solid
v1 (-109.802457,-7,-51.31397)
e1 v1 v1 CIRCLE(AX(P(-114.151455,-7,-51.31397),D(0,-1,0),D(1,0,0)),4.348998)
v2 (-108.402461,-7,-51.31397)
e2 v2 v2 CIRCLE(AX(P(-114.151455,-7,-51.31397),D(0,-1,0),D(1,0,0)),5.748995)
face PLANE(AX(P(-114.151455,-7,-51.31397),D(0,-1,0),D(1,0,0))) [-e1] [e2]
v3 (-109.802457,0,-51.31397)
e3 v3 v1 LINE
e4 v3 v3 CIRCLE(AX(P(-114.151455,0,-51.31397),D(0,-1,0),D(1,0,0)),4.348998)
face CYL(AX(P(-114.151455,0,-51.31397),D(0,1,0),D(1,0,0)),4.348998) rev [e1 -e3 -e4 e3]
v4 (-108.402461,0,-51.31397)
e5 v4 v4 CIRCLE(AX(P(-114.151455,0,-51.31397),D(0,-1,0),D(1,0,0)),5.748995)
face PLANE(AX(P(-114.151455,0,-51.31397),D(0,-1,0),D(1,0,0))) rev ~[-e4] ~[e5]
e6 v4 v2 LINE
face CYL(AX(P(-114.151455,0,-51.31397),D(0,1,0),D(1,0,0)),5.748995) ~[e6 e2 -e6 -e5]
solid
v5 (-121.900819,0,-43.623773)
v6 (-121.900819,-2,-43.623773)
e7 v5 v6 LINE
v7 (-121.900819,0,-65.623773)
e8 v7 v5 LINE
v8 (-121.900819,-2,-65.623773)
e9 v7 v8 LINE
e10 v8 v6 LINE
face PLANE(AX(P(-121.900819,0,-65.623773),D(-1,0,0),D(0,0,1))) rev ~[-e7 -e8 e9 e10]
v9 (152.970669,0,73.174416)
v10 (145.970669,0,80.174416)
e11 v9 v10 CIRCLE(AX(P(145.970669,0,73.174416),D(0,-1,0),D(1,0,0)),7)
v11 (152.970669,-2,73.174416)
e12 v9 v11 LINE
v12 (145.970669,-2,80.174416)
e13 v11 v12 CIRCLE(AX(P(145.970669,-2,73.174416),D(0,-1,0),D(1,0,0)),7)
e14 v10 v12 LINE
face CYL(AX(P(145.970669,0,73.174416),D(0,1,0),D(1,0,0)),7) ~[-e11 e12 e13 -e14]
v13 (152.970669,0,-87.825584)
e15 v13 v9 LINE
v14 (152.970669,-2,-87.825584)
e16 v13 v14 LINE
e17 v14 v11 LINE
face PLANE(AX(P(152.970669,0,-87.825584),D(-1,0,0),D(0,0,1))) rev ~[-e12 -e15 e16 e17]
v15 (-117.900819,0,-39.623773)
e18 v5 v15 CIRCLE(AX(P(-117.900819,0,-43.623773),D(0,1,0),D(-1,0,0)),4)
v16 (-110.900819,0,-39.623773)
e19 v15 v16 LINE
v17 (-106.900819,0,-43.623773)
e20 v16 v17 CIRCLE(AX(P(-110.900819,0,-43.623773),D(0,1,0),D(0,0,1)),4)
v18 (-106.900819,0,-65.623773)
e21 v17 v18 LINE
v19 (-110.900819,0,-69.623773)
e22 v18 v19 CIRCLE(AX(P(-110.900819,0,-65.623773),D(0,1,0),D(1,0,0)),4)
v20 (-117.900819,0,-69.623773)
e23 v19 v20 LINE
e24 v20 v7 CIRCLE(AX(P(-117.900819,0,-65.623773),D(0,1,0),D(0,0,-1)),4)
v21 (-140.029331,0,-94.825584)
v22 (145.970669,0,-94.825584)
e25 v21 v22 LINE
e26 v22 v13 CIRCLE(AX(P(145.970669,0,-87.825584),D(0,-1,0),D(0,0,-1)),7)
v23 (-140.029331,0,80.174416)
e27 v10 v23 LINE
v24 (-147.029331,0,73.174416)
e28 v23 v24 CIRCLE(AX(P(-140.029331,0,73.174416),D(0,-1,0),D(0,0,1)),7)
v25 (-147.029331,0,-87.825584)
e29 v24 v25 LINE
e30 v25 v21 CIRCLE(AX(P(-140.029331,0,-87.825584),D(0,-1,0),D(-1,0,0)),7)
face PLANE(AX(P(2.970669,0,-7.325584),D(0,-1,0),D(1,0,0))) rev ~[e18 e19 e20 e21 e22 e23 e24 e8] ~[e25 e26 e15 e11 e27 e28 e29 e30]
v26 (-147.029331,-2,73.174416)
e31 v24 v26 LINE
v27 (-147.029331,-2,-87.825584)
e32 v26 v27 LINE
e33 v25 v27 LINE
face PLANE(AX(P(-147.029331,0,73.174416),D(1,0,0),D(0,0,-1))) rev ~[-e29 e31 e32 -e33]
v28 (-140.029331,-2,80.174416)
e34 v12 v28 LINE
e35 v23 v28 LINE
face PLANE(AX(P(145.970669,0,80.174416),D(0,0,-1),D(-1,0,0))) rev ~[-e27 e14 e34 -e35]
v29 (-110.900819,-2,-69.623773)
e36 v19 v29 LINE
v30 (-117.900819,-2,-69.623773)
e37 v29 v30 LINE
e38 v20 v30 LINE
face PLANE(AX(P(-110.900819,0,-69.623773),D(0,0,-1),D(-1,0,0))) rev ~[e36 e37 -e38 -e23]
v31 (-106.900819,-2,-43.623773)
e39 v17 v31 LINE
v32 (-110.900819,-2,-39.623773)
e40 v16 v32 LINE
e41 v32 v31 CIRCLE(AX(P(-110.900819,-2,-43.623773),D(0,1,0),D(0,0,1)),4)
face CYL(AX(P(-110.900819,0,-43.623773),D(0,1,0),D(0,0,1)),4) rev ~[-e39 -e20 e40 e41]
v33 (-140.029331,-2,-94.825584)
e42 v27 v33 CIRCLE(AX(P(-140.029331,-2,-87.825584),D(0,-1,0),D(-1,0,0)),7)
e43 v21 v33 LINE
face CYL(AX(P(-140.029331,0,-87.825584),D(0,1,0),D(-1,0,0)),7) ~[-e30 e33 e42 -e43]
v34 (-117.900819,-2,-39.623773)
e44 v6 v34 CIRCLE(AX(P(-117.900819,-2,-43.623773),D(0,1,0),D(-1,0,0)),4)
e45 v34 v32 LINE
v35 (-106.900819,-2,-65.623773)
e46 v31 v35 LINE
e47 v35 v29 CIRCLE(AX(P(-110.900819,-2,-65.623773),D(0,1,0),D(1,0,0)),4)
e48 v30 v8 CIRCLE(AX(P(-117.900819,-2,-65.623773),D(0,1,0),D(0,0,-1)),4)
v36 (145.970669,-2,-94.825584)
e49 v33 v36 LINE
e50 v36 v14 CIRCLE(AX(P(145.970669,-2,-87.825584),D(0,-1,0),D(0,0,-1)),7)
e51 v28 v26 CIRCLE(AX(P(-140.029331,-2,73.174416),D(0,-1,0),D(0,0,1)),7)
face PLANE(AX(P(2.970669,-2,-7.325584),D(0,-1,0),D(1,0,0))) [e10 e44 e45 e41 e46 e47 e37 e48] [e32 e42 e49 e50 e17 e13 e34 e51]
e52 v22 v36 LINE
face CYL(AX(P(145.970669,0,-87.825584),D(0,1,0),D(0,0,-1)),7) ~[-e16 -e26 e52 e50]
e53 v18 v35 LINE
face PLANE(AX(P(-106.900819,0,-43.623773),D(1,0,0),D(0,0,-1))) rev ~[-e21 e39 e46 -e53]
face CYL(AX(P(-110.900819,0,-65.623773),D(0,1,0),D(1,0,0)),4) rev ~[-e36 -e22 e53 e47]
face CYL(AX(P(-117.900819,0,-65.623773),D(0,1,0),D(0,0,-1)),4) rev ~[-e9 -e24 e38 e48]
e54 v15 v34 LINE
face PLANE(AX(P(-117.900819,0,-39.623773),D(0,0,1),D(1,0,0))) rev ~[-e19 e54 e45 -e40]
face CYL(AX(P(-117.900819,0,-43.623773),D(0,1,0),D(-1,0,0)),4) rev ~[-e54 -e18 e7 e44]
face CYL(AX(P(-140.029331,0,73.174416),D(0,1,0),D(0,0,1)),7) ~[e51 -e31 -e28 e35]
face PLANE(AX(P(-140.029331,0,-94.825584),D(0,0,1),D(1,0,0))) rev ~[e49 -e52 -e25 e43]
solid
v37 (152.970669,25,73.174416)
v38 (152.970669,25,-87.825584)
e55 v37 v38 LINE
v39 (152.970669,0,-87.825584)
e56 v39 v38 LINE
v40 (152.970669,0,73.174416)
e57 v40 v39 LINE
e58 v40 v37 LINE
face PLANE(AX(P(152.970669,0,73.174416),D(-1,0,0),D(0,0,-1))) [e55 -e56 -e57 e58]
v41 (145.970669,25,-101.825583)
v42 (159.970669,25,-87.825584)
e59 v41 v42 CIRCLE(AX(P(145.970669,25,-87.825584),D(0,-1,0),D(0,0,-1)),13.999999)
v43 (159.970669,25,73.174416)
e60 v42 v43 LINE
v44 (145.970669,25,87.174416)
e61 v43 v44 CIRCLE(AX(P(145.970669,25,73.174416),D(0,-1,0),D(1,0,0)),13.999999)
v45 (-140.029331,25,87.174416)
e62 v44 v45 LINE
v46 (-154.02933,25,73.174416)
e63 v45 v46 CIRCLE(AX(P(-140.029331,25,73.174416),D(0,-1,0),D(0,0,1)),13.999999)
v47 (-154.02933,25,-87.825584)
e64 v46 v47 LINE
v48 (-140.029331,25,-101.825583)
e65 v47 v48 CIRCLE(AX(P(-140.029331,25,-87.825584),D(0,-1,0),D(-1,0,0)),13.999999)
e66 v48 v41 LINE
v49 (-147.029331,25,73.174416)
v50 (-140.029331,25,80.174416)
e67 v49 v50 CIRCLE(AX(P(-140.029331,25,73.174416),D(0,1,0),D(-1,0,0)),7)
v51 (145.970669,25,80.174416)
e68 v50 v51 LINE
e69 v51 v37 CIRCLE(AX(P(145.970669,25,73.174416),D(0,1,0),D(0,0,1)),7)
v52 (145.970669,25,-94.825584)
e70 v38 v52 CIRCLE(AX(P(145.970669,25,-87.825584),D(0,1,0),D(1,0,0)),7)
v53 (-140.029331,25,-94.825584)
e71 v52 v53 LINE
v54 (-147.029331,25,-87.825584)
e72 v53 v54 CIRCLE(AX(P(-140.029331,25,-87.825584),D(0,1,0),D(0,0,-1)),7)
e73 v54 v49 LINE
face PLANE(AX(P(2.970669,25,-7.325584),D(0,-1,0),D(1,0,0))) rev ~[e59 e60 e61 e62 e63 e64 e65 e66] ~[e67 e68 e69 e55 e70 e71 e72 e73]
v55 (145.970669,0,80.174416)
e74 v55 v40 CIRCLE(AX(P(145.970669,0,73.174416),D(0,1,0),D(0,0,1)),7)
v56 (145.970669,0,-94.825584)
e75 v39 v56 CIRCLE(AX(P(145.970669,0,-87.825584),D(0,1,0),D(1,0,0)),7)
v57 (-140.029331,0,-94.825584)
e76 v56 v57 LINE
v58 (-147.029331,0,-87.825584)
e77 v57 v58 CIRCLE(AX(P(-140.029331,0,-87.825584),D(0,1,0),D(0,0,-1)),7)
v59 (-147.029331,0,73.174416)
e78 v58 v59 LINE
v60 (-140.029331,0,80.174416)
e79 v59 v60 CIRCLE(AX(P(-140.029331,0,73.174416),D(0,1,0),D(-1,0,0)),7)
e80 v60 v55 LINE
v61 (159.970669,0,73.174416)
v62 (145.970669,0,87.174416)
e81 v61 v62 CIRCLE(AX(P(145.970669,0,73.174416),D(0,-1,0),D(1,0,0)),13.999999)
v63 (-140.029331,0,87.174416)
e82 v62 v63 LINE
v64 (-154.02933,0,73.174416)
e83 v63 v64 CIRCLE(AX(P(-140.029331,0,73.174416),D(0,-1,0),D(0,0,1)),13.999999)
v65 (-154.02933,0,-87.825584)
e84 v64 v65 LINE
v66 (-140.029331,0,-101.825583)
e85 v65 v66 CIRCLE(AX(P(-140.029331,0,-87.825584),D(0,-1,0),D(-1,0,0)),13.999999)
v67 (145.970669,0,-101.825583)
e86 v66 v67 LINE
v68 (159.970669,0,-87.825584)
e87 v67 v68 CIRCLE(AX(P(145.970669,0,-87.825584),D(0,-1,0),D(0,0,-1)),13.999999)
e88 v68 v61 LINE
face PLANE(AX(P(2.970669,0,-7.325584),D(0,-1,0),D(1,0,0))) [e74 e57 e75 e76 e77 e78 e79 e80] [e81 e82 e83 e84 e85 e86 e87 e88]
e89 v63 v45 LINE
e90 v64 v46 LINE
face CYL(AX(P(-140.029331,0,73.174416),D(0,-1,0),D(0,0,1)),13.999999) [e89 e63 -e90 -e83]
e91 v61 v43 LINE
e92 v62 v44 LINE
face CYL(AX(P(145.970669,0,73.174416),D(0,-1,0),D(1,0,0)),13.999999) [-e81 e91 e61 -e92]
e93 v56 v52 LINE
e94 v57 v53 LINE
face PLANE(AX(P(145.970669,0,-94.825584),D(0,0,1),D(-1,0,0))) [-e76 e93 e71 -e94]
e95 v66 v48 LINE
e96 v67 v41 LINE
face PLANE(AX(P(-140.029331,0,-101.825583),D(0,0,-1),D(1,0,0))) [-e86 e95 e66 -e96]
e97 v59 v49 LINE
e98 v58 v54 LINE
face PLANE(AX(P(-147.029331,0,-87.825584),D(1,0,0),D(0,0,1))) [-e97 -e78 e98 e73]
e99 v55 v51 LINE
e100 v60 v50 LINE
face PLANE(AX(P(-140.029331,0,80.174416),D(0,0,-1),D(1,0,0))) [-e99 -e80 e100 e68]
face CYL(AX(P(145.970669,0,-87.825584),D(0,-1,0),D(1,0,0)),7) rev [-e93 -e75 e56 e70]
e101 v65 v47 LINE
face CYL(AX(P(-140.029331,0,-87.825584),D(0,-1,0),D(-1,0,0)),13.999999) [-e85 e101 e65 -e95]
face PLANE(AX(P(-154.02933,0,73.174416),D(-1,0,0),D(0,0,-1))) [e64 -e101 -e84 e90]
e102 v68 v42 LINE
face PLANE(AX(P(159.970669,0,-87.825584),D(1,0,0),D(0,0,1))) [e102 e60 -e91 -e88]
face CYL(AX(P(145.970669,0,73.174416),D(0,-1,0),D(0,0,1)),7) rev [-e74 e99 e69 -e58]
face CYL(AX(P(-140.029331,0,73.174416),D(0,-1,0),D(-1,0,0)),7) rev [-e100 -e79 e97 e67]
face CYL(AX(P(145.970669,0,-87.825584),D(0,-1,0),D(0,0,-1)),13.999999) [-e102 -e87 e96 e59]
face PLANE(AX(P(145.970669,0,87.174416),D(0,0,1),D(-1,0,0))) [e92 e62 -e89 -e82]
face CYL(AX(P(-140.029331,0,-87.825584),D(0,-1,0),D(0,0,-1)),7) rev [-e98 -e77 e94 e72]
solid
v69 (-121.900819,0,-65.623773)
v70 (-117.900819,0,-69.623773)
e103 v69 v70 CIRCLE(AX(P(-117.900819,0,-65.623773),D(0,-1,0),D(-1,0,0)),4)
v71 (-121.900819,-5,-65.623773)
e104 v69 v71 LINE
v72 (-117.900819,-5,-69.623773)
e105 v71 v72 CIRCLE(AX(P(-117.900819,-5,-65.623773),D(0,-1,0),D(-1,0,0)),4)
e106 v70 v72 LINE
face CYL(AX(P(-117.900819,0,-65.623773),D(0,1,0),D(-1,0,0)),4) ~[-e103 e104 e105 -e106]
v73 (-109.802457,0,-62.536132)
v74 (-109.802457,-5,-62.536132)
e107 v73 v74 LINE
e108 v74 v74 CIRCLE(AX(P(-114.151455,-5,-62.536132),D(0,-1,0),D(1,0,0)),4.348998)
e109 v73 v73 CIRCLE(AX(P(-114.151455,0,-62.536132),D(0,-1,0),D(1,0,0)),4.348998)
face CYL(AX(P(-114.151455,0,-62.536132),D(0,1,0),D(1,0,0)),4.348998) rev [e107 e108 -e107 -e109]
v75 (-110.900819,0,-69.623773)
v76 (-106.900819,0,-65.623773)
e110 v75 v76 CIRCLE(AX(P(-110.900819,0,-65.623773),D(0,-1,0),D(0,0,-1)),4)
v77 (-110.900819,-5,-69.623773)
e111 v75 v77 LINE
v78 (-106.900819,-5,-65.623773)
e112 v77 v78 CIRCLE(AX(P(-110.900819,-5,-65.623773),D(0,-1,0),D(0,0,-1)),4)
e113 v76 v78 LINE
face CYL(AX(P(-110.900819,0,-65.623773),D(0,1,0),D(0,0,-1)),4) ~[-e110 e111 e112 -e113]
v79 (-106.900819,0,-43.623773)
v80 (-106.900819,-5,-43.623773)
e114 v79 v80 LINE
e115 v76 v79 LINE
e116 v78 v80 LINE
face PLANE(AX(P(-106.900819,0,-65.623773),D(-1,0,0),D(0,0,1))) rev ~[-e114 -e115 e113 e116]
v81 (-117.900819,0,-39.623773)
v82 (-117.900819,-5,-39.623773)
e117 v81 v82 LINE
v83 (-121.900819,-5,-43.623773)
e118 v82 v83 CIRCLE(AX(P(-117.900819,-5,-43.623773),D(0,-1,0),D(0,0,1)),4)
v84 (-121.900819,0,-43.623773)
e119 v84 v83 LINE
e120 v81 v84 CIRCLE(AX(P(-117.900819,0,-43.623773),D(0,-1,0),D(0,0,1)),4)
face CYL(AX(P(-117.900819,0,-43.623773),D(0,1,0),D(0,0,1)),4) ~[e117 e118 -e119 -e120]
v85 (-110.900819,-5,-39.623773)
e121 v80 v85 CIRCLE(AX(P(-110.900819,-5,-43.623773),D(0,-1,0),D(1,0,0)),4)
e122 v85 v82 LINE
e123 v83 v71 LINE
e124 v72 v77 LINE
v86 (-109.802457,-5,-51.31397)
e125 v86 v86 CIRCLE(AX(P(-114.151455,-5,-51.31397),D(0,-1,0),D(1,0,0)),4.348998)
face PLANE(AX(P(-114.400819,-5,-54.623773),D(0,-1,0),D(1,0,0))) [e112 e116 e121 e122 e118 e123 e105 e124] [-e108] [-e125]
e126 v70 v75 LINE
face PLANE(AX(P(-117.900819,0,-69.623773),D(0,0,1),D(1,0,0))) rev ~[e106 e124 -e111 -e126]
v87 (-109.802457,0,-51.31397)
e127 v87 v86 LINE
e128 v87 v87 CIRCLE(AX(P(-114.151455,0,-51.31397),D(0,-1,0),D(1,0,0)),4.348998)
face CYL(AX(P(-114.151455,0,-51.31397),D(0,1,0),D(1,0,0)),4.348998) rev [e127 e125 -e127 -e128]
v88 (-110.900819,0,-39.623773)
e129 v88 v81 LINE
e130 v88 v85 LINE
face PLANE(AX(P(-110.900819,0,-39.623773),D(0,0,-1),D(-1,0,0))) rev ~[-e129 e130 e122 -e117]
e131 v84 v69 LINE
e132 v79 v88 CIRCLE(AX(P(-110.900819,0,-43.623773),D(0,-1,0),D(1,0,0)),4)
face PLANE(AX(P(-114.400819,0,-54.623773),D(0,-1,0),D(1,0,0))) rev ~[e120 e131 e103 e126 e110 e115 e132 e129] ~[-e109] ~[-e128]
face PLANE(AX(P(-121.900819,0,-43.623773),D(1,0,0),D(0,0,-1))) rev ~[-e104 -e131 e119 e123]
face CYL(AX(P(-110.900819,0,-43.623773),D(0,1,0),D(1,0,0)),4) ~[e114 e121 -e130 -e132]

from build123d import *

# Parameters (mm, degrees)
F1_DEPTH = 25
F2_DEPTH = 2
F0_R     = 4.348998023
F0_R_2   = 5.7489946485
F3_DEPTH = 5
F4_DEPTH = 7


with BuildPart() as f1:
    # F0 (on Front) → F1 (new body)
    with BuildSketch(Plane.XZ):
        with BuildLine():
            Line((145.9706694186, 87.1744155884), (-140.0293305814, 87.1744155884))
            ThreePointArc((-140.0293305814, 87.1744155884), (-149.9288249466, 83.0739107617), (-154.0293297732, 73.1744163966))
            Line((-154.0293297732, 73.1744163966), (-154.0293297732, -87.8255836034))
            ThreePointArc((-154.0293297732, -87.8255836034), (-149.9288249466, -97.7250779685), (-140.0293305814, -101.8255827952))
            Line((-140.0293305814, -101.8255827952), (145.9706694186, -101.8255827952))
            ThreePointArc((145.9706694186, -101.8255827952), (155.8701637837, -97.7250779685), (159.9706686104, -87.8255836034))
            Line((159.9706686104, -87.8255836034), (159.9706686104, 73.1744163966))
            ThreePointArc((159.9706686104, 73.1744163966), (155.8701637837, 83.0739107617), (145.9706694186, 87.1744155884))
        make_face()
        with BuildLine():
            ThreePointArc((-147.0293305814, 73.1744163966), (-144.9790780497, 78.1241638649), (-140.0293305814, 80.1744163966))
            Line((-140.0293305814, 80.1744163966), (145.9706694186, 80.1744163966))
            ThreePointArc((145.9706694186, 80.1744163966), (150.9204168869, 78.1241638649), (152.9706694186, 73.1744163966))
            Line((152.9706694186, 73.1744163966), (152.9706694186, -87.8255836034))
            ThreePointArc((152.9706694186, -87.8255836034), (150.9204168869, -92.7753310717), (145.9706694186, -94.8255836034))
            Line((145.9706694186, -94.8255836034), (-140.0293305814, -94.8255836034))
            ThreePointArc((-140.0293305814, -94.8255836034), (-144.9790780497, -92.7753310717), (-147.0293305814, -87.8255836034))
            Line((-147.0293305814, -87.8255836034), (-147.0293305814, 73.1744163966))
        make_face(mode=Mode.SUBTRACT)
    extrude(amount=-F1_DEPTH)


with BuildPart() as f2:
    # F0 (on Front) → F2 (new body)
    with BuildSketch(Plane.XZ):
        with BuildLine():
            Line((145.9706694186, 80.1744163966), (-140.0293305814, 80.1744163966))
            ThreePointArc((-140.0293305814, 80.1744163966), (-144.9790780497, 78.1241638649), (-147.0293305814, 73.1744163966))
            Line((-147.0293305814, 73.1744163966), (-147.0293305814, -87.8255836034))
            ThreePointArc((-147.0293305814, -87.8255836034), (-144.9790780497, -92.7753310717), (-140.0293305814, -94.8255836034))
            Line((-140.0293305814, -94.8255836034), (145.9706694186, -94.8255836034))
            ThreePointArc((145.9706694186, -94.8255836034), (150.9204168869, -92.7753310717), (152.9706694186, -87.8255836034))
            Line((152.9706694186, -87.8255836034), (152.9706694186, 73.1744163966))
            ThreePointArc((152.9706694186, 73.1744163966), (150.9204168869, 78.1241638649), (145.9706694186, 80.1744163966))
        make_face()
        with BuildLine():
            ThreePointArc((-121.900819242, -43.6237730914), (-120.7292463667, -40.7953459667), (-117.900819242, -39.6237730914))
            Line((-117.900819242, -39.6237730914), (-110.900819242, -39.6237730914))
            ThreePointArc((-110.900819242, -39.6237730914), (-108.0723921173, -40.7953459667), (-106.900819242, -43.6237730914))
            Line((-106.900819242, -43.6237730914), (-106.900819242, -65.6237730914))
            ThreePointArc((-106.900819242, -65.6237730914), (-108.0723921173, -68.4522002162), (-110.900819242, -69.6237730914))
            Line((-110.900819242, -69.6237730914), (-117.900819242, -69.6237730914))
            ThreePointArc((-117.900819242, -69.6237730914), (-120.7292463667, -68.4522002162), (-121.900819242, -65.6237730914))
            Line((-121.900819242, -65.6237730914), (-121.900819242, -43.6237730914))
        make_face(mode=Mode.SUBTRACT)
    extrude(amount=F2_DEPTH)


with BuildPart() as f3:
    # F0 (on Front) → F3 (new body)
    with BuildSketch(Plane.XZ):
        with BuildLine():
            Line((-110.900819242, -39.6237730914), (-117.900819242, -39.6237730914))
            ThreePointArc((-117.900819242, -39.6237730914), (-120.7292463667, -40.7953459667), (-121.900819242, -43.6237730914))
            Line((-121.900819242, -43.6237730914), (-121.900819242, -65.6237730914))
            ThreePointArc((-121.900819242, -65.6237730914), (-120.7292463667, -68.4522002162), (-117.900819242, -69.6237730914))
            Line((-117.900819242, -69.6237730914), (-110.900819242, -69.6237730914))
            ThreePointArc((-110.900819242, -69.6237730914), (-108.0723921173, -68.4522002162), (-106.900819242, -65.6237730914))
            Line((-106.900819242, -65.6237730914), (-106.900819242, -43.6237730914))
            ThreePointArc((-106.900819242, -43.6237730914), (-108.0723921173, -40.7953459667), (-110.900819242, -39.6237730914))
        make_face()
        with Locations((-114.151455462, -62.5361315906)):
            Circle(F0_R, mode=Mode.SUBTRACT)
        with Locations((-114.151455462, -51.313970238)):
            Circle(F0_R_2, mode=Mode.SUBTRACT)
        with Locations((-114.151455462, -51.313970238)):
            Circle(F0_R_2)
        with Locations((-114.151455462, -51.313970238)):
            Circle(F0_R, mode=Mode.SUBTRACT)
    extrude(amount=F3_DEPTH)


with BuildPart() as f4:
    # F0 (on Front) → F4 (new body)
    with BuildSketch(Plane.XZ):
        with Locations((-114.151455462, -51.313970238)):
            Circle(F0_R_2)
        with Locations((-114.151455462, -51.313970238)):
            Circle(F0_R, mode=Mode.SUBTRACT)
    extrude(amount=F4_DEPTH)


solid = Compound([f1.part, f2.part, f3.part, f4.part])
